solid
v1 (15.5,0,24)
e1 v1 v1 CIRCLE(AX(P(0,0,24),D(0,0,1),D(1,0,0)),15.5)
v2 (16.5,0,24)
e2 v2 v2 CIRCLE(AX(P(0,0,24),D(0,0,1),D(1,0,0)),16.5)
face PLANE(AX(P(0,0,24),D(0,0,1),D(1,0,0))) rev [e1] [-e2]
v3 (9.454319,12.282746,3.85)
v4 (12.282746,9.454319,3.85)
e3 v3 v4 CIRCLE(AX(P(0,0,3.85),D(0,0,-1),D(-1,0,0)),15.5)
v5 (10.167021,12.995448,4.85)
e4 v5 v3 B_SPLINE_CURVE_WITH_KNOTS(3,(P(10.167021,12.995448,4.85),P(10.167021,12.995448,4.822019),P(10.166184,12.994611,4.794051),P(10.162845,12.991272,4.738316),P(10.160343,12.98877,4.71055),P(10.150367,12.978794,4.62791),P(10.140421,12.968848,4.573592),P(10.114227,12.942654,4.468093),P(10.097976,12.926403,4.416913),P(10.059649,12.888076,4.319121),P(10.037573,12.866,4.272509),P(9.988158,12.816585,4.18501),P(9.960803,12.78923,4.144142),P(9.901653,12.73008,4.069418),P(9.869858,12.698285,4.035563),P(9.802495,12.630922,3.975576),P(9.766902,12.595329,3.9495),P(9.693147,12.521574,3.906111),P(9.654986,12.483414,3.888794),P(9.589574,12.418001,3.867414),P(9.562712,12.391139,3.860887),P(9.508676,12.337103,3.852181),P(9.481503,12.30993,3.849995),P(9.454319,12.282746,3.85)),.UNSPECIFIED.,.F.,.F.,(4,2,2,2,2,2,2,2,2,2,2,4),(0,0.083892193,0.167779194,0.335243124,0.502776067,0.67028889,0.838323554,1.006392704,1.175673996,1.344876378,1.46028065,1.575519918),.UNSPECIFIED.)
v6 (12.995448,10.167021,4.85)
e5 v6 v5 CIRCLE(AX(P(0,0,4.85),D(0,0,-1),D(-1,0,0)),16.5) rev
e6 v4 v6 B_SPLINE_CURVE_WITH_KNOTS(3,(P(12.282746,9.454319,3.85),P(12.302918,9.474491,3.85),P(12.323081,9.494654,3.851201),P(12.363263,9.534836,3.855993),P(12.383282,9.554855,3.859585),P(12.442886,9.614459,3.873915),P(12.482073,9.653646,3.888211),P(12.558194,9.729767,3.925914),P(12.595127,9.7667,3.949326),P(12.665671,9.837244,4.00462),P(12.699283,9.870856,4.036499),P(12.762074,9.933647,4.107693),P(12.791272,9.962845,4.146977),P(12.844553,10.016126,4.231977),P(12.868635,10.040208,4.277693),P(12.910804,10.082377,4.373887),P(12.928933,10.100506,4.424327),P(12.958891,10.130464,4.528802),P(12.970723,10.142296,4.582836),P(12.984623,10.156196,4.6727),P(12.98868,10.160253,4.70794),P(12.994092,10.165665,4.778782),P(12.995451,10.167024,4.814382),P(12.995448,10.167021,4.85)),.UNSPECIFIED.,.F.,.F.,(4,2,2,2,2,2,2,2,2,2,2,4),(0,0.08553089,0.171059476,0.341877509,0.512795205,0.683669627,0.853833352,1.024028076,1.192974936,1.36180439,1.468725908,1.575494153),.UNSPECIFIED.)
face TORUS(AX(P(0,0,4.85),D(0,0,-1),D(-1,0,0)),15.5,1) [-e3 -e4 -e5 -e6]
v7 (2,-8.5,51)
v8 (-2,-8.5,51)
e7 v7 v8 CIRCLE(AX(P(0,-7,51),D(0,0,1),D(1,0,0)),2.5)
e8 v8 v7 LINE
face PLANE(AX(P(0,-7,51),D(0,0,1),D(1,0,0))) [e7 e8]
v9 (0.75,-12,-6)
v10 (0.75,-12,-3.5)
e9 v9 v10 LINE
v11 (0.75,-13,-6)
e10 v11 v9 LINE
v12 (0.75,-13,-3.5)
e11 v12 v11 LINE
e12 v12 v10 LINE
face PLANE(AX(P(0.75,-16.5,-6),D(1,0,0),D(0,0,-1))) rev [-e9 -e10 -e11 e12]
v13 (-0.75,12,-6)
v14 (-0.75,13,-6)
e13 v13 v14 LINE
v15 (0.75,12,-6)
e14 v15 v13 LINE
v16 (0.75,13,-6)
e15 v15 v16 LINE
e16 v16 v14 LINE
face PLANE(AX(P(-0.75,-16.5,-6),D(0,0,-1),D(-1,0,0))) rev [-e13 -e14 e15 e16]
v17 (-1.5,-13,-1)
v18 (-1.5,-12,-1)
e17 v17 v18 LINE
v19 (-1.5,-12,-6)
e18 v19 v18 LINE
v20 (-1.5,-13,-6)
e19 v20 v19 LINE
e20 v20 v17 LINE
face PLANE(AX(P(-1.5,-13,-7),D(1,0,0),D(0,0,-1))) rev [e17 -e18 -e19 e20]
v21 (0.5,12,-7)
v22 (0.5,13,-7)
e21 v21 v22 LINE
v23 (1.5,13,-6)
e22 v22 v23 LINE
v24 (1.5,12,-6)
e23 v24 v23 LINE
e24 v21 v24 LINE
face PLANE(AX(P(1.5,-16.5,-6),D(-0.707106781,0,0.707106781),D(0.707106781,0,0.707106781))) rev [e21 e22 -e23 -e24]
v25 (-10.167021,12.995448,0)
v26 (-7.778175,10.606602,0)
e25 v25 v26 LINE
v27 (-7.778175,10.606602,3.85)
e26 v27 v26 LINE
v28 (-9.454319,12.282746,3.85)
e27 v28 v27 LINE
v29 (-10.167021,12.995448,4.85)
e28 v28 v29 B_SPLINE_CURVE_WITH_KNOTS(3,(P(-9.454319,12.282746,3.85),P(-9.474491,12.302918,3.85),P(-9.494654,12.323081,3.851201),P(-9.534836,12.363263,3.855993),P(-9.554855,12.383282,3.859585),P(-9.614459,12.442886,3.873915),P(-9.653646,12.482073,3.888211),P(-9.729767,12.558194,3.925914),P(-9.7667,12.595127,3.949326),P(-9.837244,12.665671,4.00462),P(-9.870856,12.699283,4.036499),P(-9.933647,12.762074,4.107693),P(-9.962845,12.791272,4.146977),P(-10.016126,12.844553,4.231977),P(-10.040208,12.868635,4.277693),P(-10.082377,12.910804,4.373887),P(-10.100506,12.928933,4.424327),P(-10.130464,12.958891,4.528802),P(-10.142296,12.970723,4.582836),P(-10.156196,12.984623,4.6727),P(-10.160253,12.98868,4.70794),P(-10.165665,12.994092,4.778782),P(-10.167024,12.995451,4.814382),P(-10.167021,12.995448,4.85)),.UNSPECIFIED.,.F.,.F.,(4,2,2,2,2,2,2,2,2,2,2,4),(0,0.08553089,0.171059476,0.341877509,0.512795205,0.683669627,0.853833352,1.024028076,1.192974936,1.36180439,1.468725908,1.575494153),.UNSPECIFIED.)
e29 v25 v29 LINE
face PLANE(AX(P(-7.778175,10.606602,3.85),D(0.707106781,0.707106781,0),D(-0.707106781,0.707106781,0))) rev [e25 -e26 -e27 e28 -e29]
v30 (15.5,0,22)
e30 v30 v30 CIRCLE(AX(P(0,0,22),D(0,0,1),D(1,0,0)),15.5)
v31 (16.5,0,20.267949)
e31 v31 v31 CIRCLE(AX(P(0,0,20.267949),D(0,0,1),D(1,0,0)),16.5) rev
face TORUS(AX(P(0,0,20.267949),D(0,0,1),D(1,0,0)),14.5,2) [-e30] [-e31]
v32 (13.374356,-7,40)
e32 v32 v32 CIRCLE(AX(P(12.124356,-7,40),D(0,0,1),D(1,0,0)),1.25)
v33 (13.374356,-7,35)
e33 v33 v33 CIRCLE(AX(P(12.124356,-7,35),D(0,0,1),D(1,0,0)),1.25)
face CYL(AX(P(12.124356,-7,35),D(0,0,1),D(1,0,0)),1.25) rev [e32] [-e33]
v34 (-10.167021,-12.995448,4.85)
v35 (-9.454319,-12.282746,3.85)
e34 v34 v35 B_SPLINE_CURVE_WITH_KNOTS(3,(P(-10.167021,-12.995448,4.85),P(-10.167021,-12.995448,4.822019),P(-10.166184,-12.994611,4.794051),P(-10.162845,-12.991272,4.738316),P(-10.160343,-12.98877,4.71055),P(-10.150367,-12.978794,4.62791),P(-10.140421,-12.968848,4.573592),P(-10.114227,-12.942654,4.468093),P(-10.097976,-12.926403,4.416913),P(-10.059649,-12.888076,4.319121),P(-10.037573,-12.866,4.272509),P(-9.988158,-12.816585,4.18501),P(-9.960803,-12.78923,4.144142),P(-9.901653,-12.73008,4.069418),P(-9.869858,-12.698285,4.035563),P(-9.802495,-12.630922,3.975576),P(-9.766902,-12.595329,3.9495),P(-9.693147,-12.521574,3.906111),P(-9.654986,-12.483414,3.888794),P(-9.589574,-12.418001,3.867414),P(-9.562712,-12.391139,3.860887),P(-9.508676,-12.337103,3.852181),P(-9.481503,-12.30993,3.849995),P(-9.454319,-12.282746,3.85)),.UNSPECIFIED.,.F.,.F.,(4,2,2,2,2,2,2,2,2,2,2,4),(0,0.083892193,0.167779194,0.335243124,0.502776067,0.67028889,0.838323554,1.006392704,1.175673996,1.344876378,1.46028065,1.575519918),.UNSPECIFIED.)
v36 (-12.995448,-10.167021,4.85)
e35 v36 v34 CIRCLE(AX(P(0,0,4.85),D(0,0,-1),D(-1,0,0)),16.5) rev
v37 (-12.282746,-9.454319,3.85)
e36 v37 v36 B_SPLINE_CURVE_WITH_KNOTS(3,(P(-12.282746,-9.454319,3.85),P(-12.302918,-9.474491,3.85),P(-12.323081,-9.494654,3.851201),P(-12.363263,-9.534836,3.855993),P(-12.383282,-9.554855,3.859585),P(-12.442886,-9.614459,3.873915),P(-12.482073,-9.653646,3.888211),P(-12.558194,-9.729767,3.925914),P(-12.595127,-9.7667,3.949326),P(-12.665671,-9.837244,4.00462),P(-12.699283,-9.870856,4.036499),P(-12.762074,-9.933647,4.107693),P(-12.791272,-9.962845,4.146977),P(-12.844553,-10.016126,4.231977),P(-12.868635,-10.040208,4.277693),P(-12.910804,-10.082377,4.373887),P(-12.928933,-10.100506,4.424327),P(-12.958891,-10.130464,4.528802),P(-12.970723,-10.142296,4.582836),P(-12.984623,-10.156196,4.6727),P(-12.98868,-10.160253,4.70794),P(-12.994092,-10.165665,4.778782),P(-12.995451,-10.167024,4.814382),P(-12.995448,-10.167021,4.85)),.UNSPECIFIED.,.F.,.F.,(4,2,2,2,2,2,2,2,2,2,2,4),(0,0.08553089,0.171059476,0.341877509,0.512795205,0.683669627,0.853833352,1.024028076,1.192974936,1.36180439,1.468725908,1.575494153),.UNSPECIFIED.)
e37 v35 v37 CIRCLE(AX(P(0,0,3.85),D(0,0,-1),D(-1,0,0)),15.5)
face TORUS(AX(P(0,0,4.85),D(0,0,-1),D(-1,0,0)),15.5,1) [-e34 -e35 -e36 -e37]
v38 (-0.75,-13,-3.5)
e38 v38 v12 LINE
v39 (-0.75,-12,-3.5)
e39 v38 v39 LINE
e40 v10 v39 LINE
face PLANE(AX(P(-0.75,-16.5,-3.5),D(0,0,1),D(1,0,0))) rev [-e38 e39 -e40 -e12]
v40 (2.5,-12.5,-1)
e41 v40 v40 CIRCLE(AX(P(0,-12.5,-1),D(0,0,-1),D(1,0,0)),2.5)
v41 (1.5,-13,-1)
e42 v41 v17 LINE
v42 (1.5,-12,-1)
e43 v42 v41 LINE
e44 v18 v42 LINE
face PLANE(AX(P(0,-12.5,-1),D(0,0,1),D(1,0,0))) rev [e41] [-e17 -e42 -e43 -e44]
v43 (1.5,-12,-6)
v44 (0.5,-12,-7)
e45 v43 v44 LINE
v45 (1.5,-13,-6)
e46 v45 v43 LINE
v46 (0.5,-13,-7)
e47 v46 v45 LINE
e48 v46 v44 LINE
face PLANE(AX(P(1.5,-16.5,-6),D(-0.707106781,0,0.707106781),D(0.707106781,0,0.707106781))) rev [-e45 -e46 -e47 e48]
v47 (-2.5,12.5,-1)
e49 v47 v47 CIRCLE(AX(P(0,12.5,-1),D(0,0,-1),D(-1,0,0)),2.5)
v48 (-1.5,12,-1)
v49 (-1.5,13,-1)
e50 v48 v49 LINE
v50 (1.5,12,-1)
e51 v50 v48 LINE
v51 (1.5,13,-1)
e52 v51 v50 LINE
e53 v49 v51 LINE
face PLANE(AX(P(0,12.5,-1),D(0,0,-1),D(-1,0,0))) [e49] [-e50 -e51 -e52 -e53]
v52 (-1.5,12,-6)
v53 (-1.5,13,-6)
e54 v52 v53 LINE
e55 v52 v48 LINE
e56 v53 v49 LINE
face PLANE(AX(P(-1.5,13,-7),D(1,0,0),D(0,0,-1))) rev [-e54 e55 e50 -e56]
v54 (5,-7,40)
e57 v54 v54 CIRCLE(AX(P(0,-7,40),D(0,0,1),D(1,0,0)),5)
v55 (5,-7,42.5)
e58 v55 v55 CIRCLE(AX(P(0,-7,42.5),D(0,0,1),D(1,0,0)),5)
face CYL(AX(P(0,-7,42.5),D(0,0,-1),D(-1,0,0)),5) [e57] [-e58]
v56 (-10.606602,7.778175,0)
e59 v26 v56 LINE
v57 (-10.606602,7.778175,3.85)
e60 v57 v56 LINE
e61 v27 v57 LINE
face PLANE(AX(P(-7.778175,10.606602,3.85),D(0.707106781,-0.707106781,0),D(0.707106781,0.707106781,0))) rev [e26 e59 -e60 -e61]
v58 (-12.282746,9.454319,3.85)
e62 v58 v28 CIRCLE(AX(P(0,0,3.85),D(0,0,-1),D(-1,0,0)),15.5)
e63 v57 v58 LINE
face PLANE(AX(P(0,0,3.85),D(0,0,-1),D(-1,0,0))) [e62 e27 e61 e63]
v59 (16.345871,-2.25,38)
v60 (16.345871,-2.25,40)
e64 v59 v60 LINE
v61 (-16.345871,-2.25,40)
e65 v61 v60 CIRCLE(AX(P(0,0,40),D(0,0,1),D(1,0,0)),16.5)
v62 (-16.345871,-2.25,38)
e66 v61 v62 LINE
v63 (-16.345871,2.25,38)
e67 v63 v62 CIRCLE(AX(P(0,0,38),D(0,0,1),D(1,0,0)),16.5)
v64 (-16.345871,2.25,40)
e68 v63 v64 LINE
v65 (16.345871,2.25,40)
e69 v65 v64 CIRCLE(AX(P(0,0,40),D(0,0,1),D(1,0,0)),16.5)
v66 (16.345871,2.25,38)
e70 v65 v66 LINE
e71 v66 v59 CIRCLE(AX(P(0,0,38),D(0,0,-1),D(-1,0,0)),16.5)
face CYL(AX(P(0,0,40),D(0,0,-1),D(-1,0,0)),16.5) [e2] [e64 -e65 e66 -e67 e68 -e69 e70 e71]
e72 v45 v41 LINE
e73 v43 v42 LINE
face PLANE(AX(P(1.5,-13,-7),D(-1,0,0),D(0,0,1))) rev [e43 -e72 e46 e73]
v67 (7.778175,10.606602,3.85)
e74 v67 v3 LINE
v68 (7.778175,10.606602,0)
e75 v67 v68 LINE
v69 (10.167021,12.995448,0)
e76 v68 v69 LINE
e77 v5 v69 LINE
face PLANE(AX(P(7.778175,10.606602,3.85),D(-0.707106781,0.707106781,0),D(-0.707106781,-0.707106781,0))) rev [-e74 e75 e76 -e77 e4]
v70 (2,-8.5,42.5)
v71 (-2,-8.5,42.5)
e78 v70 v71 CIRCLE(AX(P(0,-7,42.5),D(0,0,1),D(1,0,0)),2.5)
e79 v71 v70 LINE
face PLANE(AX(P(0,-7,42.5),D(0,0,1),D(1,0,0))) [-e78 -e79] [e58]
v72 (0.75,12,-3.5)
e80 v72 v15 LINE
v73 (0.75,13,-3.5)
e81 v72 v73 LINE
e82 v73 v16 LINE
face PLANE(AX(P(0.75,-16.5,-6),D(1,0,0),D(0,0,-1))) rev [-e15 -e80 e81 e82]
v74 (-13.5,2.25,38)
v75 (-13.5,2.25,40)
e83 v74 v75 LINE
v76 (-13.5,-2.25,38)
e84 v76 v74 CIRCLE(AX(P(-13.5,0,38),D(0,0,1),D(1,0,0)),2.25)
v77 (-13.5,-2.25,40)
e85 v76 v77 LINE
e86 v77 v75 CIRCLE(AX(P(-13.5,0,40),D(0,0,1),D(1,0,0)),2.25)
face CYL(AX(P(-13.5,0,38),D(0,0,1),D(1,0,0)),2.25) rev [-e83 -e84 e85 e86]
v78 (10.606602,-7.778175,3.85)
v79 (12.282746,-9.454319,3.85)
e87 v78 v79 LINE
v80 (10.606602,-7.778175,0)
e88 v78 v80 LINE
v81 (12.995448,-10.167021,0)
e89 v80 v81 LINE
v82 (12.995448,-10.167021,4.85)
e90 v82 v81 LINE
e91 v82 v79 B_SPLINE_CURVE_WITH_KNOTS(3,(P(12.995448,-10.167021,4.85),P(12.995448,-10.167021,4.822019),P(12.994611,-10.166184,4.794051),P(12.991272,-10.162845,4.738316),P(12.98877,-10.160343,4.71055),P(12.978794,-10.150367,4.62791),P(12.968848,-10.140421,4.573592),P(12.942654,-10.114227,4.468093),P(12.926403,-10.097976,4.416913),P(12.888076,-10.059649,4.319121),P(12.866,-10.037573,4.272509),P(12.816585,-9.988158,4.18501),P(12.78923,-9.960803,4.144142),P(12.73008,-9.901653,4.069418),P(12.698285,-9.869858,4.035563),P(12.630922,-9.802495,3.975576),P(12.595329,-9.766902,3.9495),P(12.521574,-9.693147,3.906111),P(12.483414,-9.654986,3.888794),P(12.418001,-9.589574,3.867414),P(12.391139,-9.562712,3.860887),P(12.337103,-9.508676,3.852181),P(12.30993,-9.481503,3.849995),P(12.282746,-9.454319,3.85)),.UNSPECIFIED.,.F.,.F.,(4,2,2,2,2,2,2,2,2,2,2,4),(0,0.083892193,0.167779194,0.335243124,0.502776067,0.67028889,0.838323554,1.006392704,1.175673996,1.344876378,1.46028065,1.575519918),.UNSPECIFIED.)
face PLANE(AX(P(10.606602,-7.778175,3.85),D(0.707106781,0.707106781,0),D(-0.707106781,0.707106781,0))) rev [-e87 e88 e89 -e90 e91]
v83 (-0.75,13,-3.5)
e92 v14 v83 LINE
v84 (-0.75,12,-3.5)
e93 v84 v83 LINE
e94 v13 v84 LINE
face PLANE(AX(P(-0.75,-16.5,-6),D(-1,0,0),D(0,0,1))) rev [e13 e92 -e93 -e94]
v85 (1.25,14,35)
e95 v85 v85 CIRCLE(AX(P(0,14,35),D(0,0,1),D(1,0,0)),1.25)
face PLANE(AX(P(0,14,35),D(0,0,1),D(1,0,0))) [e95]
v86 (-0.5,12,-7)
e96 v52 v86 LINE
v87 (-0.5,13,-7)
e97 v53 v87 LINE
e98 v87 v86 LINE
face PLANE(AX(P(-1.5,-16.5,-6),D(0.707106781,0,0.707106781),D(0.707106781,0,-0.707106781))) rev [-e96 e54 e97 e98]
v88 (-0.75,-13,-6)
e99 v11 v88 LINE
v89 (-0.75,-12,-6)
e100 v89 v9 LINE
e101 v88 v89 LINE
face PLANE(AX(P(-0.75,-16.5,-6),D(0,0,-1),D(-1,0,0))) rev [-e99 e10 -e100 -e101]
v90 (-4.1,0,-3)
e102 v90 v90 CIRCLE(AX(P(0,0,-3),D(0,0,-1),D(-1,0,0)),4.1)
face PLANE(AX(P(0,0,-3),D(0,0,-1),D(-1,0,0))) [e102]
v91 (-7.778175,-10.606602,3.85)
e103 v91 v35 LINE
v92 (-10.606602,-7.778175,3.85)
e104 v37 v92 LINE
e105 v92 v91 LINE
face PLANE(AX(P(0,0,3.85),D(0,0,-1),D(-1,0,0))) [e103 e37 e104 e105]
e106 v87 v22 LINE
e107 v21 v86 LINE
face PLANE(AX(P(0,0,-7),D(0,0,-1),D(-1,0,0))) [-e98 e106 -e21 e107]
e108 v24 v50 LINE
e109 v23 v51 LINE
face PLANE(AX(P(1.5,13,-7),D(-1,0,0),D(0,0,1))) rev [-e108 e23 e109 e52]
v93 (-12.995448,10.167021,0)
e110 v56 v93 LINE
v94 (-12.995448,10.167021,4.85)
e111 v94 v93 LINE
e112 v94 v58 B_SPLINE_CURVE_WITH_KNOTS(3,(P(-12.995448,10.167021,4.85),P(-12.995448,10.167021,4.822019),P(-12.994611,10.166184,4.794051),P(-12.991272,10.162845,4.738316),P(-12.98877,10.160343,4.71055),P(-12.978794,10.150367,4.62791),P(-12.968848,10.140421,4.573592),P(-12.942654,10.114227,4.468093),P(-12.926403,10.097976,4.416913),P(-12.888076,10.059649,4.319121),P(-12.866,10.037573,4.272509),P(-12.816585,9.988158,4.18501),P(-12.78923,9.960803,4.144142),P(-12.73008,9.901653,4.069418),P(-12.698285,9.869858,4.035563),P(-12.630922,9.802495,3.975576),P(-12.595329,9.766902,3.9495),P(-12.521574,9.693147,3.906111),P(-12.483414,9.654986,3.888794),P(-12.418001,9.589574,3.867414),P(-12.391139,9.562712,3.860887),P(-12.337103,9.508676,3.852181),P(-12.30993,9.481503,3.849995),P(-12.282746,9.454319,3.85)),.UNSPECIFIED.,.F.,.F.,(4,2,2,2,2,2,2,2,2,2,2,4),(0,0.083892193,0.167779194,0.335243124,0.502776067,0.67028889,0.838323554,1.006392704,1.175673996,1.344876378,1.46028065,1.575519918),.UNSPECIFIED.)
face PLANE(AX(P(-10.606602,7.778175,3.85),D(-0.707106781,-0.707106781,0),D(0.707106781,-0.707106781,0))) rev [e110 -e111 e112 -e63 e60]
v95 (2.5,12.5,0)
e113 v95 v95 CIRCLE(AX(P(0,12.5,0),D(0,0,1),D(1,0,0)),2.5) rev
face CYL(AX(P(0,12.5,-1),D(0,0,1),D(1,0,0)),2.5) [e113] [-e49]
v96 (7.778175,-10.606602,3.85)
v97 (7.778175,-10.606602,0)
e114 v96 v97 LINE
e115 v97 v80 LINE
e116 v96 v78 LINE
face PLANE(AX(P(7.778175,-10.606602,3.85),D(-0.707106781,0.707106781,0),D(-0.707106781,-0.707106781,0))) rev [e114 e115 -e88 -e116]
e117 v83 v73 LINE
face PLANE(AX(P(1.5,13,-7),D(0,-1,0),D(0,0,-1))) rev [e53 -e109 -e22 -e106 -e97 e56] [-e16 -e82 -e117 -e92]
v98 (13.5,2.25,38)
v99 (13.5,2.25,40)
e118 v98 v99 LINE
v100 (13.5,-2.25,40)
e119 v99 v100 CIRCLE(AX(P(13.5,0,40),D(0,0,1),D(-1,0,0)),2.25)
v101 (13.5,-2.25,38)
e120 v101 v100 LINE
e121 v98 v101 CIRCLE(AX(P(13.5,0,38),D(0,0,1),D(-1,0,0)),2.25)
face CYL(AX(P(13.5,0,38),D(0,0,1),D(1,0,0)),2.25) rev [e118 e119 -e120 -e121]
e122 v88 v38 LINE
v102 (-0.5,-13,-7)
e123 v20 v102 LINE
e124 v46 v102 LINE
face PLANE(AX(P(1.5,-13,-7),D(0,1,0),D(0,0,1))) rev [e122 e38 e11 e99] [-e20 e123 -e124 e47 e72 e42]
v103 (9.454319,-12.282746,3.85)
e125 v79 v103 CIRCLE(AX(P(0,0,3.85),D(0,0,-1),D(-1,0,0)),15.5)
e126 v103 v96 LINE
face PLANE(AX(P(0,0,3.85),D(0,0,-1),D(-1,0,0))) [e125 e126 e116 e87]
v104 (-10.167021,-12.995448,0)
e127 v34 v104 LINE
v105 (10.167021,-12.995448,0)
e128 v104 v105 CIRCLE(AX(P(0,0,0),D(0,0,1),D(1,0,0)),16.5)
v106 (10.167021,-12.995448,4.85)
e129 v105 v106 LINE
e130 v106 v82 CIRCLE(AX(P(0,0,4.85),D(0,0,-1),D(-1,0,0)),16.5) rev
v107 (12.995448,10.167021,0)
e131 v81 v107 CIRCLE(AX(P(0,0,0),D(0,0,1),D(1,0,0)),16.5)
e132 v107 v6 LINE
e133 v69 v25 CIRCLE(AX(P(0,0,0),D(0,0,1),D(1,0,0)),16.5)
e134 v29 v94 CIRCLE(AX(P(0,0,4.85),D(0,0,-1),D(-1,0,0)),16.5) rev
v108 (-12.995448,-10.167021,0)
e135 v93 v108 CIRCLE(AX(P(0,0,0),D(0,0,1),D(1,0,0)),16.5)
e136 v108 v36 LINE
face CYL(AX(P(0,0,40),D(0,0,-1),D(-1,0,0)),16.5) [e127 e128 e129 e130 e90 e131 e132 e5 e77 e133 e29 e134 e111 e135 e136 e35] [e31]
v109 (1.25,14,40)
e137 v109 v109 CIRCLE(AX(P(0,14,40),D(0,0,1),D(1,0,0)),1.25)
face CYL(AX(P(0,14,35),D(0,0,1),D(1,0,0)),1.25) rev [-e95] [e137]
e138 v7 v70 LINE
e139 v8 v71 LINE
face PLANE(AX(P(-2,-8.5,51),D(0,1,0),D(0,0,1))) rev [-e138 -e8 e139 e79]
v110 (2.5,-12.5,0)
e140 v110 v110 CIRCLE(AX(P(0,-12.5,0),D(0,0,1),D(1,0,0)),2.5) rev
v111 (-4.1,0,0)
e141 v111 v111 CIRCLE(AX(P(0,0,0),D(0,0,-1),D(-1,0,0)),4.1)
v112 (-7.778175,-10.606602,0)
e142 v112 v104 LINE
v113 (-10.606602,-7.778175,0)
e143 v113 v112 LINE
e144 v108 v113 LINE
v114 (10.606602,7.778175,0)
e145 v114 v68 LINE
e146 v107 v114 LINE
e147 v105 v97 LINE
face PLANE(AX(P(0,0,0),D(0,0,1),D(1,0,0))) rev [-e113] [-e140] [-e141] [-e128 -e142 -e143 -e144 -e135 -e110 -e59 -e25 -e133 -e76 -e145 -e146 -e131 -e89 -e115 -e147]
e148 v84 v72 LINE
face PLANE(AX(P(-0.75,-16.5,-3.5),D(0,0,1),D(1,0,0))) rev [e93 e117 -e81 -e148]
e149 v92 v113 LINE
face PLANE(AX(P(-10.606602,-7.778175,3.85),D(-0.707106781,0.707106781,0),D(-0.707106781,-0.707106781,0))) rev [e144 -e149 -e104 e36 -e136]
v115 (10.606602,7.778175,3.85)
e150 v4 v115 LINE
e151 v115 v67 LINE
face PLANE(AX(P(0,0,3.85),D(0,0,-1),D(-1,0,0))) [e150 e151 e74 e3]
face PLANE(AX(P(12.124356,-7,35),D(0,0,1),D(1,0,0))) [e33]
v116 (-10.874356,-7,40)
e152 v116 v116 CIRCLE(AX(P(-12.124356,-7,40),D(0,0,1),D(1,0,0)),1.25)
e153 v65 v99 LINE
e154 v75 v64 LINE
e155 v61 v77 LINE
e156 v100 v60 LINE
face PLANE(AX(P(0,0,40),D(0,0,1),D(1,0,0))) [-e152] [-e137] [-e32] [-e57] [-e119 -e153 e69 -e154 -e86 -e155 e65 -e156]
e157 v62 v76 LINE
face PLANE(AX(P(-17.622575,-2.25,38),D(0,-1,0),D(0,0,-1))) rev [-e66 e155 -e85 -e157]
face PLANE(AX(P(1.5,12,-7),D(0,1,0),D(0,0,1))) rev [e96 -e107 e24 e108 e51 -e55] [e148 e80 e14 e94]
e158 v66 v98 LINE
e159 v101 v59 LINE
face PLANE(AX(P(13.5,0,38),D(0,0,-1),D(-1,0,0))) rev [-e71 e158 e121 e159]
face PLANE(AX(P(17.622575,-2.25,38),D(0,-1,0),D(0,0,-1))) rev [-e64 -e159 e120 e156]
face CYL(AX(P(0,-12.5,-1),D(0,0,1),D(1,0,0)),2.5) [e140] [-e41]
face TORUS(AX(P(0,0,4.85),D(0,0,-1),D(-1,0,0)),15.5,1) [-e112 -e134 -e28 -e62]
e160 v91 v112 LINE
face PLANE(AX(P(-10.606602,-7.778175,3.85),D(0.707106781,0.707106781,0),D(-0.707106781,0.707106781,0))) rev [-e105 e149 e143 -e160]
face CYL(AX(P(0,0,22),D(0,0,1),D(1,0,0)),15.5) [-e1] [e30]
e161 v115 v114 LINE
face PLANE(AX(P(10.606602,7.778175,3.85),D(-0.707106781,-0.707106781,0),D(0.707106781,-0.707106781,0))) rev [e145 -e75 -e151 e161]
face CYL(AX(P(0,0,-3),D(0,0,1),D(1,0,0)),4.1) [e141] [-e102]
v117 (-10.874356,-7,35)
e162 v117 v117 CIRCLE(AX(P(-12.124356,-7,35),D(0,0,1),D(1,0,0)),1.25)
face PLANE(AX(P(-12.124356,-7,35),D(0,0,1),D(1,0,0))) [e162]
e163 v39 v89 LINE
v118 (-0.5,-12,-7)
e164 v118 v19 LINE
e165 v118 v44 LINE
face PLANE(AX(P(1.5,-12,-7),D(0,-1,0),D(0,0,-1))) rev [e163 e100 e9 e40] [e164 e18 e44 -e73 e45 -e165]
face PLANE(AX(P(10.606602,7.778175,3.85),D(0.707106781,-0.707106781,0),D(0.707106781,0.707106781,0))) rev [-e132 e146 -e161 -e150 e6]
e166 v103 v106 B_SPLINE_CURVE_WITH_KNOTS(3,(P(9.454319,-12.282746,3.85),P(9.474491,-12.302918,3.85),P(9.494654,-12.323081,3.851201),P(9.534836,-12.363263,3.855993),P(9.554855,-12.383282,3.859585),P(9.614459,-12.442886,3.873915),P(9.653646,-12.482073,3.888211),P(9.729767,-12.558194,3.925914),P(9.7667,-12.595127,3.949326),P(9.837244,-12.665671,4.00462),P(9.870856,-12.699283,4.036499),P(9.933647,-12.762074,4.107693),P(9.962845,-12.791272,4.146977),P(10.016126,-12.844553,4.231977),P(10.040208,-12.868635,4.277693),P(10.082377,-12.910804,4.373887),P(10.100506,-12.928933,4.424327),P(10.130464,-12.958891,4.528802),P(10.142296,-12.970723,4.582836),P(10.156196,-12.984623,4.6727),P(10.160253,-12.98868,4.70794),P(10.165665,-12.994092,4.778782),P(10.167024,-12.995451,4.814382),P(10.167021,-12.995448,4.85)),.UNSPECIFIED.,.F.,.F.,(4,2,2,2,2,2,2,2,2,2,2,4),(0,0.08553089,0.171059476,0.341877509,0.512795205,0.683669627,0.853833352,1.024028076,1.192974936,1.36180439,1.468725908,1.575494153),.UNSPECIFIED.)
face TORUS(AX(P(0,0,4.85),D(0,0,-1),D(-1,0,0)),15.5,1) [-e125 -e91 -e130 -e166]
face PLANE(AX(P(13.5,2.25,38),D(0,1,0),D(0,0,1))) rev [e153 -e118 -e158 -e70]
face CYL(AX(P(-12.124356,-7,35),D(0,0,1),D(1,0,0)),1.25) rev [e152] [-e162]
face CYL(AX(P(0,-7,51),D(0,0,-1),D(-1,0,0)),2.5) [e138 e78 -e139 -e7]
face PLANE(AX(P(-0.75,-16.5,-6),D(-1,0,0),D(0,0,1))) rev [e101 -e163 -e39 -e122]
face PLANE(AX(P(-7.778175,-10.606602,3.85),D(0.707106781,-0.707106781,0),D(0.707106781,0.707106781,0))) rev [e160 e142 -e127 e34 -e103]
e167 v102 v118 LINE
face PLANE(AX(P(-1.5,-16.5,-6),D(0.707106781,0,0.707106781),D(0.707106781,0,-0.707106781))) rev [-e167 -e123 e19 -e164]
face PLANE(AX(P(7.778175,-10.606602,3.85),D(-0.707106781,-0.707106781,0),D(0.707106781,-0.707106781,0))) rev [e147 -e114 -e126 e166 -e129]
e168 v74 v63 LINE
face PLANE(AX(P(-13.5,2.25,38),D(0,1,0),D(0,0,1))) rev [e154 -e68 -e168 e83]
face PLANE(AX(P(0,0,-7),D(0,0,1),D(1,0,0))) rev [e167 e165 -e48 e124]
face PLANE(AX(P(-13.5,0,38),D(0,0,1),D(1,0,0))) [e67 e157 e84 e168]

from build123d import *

# Parameters (mm, degrees)
SKETCH1_R           = 16.5
BOSS_EXTRUDE1_DEPTH = 40
SKETCH2_R           = 1.25
CUT_EXTRUDE1_DEPTH  = 5
SKETCH3_R           = 5
BOSS_EXTRUDE2_DEPTH = 2.5
BOSS_EXTRUDE3_DEPTH = 8.5
CUT_EXTRUDE2_DEPTH  = 2
CUT_EXTRUDE3_START  = -16
SKETCH6_R           = 17.194108904
SKETCH6_R_2         = 15.5
CUT_EXTRUDE3_DEPTH  = 2
FILLET1_R           = 2
SKETCH7_R           = 4.1
BOSS_EXTRUDE4_DEPTH = 3
SKETCH8_R           = 2.5
BOSS_EXTRUDE5_DEPTH = 1
SKETCH9_W           = 3
SKETCH9_H           = 1
BOSS_EXTRUDE6_DEPTH = 6
CUT_EXTRUDE4_DEPTH  = 62.184148274
SKETCH11_W          = 1.5
SKETCH11_H          = 2.5
CUT_EXTRUDE5_DEPTH  = 62.184148274
CUT_EXTRUDE6_DEPTH  = 3.85
FILLET2_R           = 1


with BuildPart() as part:
    # Sketch1 → Boss-Extrude1 (new body)
    with BuildSketch(Plane.XY):
        Circle(SKETCH1_R)
    extrude(amount=BOSS_EXTRUDE1_DEPTH)

    # Sketch2 → Cut-Extrude1 (cut)
    with BuildSketch(Plane.XY.offset(40)):
        with Locations((0, 14)):
            Circle(SKETCH2_R)
        with Locations((12.124355653, -7)):
            Circle(SKETCH2_R)
        with Locations((-12.124355653, -7)):
            Circle(SKETCH2_R)
    extrude(amount=-CUT_EXTRUDE1_DEPTH, mode=Mode.SUBTRACT)

    # Sketch3 → Boss-Extrude2 (add)
    with BuildSketch(Plane.XY.offset(40)):
        with Locations((0, -7)):
            Circle(SKETCH3_R)
    extrude(amount=BOSS_EXTRUDE2_DEPTH)

    # Sketch4 → Boss-Extrude3 (add)
    with BuildSketch(Plane.XY.offset(42.5)):
        with BuildLine():
            Line((-2, -8.5), (2, -8.5))
            ThreePointArc((2, -8.5), (0, -4.5), (-2, -8.5))
        make_face()
    extrude(amount=BOSS_EXTRUDE3_DEPTH)

    # Sketch5 → Cut-Extrude2 (cut)
    with BuildSketch(Plane.XY.offset(40)):
        with BuildLine():
            Line((-13.5, 2.25), (-17.622574656, 2.25))
            Line((-17.622574656, 2.25), (-17.622574656, -2.25))
            Line((-17.622574656, -2.25), (-13.5, -2.25))
            ThreePointArc((-13.5, -2.25), (-11.25, 0), (-13.5, 2.25))
        make_face()
        with BuildLine():
            Line((17.622574656, -2.25), (13.5, -2.25))
            ThreePointArc((13.5, -2.25), (11.25, 0), (13.5, 2.25))
            Line((13.5, 2.25), (17.622574656, 2.25))
            Line((17.622574656, 2.25), (17.622574656, -2.25))
        make_face()
    extrude(amount=-CUT_EXTRUDE2_DEPTH, mode=Mode.SUBTRACT)

    # Sketch6 → Cut-Extrude3 (cut)
    with BuildSketch(Plane.XY.offset(40).offset(CUT_EXTRUDE3_START)):
        Circle(SKETCH6_R)
        Circle(SKETCH6_R_2, mode=Mode.SUBTRACT)
    extrude(amount=-CUT_EXTRUDE3_DEPTH, mode=Mode.SUBTRACT)

    # Fillet1
    # the kernel refuses this fillet: 2 mm, written as the material it takes off along each edge
    with BuildSketch(Plane(origin=(0, 0, 22), x_dir=(1, 0, 0), z_dir=(0, 1, 0))) as fillet1_piece_1:
        with BuildLine():
            CenterArc((14.5, 1.732050808), FILLET1_R, 300, 60)
            Line((15.5, 0), (15.52, -0.034641016))
            ThreePointArc((15.52, -0.034641016), (16, -0.04), (16.5, -0.04))
            Line((16.5, -0.04), (16.54, 0))
            Line((16.54, 0), (16.54, 1.732050808))
            Line((16.54, 1.732050808), (16.5, 1.732050808))
        make_face()
    revolve(axis=Axis((0, 0, 22), (0, 0, -1)), mode=Mode.SUBTRACT)

    # Sketch7 → Boss-Extrude4 (add)
    with BuildSketch(Plane(origin=(0, 0, 0), x_dir=(-1, 0, 0), z_dir=(0, 0, -1))):
        Circle(SKETCH7_R)
    extrude(amount=BOSS_EXTRUDE4_DEPTH)

    # Sketch8 → Boss-Extrude5 (add)
    with BuildSketch(Plane(origin=(0, 0, 0), x_dir=(-1, 0, 0), z_dir=(0, 0, -1))):
        with Locations(Location((0, 12.5, 0), (0, 0, 180))):
            Circle(SKETCH8_R)
        with Locations(Location((0, -12.5, 0), (0, 0, 180))):
            Circle(SKETCH8_R)
    extrude(amount=BOSS_EXTRUDE5_DEPTH)

    # Sketch9 → Boss-Extrude6 (add)
    with BuildSketch(Plane(origin=(0, 0, -1), x_dir=(-1, 0, 0), z_dir=(0, 0, -1))):
        with Locations((0, -12.5)):
            Rectangle(SKETCH9_W, SKETCH9_H)
        with Locations((0, 12.5)):
            Rectangle(SKETCH9_W, SKETCH9_H)
    extrude(amount=BOSS_EXTRUDE6_DEPTH)

    # Sketch10 → Cut-Extrude4 (cut, through all)
    with BuildSketch(Plane(origin=(0, 13, 0), x_dir=(1, 0, 0), z_dir=(0, 1, 0))):
        Polygon((-1.5, 7), (-0.5, 7), (-1.5, 6), align=None)
        Polygon((1.5, 7), (0.5, 7), (1.5, 6), align=None)
    extrude(amount=-CUT_EXTRUDE4_DEPTH, mode=Mode.SUBTRACT)

    # Sketch11 → Cut-Extrude5 (cut, through all)
    with BuildSketch(Plane(origin=(0, 13, 0), x_dir=(1, 0, 0), z_dir=(0, 1, 0))):
        with Locations((0, 4.75)):
            Rectangle(SKETCH11_W, SKETCH11_H)
    extrude(amount=-CUT_EXTRUDE5_DEPTH, mode=Mode.SUBTRACT)

    # Sketch12 → Cut-Extrude6 (cut)
    with BuildSketch(Plane(origin=(0, 0, 0), x_dir=(-1, 0, 0), z_dir=(0, 0, -1))):
        Polygon((7.778174593, 10.606601718), (11.692726543, 14.521153668), (14.527839542, 11.699412418), (10.606601718, 7.778174593), align=None)
        Polygon((10.606601718, -7.778174593), (14.521153668, -11.692726543), (11.699412418, -14.527839542), (7.778174593, -10.606601718), align=None)
        Polygon((-7.778174593, -10.606601718), (-11.692726543, -14.521153668), (-14.527839542, -11.699412418), (-10.606601718, -7.778174593), align=None)
        Polygon((-10.606601718, 7.778174593), (-14.521153668, 11.692726543), (-11.699412418, 14.527839542), (-7.778174593, 10.606601718), align=None)
    extrude(amount=-CUT_EXTRUDE6_DEPTH, mode=Mode.SUBTRACT)

    # Fillet2
    fillet2_edges = [part.edges().sort_by_distance(p)[0] for p in [
        (-11.66726189, 11.66726189, 3.85),
        (-11.66726189, -11.66726189, 3.85),
        (11.66726189, -11.66726189, 3.85),
        (11.66726189, 11.66726189, 3.85),
    ]]
    fillet(fillet2_edges, radius=FILLET2_R)


solid = part.part
